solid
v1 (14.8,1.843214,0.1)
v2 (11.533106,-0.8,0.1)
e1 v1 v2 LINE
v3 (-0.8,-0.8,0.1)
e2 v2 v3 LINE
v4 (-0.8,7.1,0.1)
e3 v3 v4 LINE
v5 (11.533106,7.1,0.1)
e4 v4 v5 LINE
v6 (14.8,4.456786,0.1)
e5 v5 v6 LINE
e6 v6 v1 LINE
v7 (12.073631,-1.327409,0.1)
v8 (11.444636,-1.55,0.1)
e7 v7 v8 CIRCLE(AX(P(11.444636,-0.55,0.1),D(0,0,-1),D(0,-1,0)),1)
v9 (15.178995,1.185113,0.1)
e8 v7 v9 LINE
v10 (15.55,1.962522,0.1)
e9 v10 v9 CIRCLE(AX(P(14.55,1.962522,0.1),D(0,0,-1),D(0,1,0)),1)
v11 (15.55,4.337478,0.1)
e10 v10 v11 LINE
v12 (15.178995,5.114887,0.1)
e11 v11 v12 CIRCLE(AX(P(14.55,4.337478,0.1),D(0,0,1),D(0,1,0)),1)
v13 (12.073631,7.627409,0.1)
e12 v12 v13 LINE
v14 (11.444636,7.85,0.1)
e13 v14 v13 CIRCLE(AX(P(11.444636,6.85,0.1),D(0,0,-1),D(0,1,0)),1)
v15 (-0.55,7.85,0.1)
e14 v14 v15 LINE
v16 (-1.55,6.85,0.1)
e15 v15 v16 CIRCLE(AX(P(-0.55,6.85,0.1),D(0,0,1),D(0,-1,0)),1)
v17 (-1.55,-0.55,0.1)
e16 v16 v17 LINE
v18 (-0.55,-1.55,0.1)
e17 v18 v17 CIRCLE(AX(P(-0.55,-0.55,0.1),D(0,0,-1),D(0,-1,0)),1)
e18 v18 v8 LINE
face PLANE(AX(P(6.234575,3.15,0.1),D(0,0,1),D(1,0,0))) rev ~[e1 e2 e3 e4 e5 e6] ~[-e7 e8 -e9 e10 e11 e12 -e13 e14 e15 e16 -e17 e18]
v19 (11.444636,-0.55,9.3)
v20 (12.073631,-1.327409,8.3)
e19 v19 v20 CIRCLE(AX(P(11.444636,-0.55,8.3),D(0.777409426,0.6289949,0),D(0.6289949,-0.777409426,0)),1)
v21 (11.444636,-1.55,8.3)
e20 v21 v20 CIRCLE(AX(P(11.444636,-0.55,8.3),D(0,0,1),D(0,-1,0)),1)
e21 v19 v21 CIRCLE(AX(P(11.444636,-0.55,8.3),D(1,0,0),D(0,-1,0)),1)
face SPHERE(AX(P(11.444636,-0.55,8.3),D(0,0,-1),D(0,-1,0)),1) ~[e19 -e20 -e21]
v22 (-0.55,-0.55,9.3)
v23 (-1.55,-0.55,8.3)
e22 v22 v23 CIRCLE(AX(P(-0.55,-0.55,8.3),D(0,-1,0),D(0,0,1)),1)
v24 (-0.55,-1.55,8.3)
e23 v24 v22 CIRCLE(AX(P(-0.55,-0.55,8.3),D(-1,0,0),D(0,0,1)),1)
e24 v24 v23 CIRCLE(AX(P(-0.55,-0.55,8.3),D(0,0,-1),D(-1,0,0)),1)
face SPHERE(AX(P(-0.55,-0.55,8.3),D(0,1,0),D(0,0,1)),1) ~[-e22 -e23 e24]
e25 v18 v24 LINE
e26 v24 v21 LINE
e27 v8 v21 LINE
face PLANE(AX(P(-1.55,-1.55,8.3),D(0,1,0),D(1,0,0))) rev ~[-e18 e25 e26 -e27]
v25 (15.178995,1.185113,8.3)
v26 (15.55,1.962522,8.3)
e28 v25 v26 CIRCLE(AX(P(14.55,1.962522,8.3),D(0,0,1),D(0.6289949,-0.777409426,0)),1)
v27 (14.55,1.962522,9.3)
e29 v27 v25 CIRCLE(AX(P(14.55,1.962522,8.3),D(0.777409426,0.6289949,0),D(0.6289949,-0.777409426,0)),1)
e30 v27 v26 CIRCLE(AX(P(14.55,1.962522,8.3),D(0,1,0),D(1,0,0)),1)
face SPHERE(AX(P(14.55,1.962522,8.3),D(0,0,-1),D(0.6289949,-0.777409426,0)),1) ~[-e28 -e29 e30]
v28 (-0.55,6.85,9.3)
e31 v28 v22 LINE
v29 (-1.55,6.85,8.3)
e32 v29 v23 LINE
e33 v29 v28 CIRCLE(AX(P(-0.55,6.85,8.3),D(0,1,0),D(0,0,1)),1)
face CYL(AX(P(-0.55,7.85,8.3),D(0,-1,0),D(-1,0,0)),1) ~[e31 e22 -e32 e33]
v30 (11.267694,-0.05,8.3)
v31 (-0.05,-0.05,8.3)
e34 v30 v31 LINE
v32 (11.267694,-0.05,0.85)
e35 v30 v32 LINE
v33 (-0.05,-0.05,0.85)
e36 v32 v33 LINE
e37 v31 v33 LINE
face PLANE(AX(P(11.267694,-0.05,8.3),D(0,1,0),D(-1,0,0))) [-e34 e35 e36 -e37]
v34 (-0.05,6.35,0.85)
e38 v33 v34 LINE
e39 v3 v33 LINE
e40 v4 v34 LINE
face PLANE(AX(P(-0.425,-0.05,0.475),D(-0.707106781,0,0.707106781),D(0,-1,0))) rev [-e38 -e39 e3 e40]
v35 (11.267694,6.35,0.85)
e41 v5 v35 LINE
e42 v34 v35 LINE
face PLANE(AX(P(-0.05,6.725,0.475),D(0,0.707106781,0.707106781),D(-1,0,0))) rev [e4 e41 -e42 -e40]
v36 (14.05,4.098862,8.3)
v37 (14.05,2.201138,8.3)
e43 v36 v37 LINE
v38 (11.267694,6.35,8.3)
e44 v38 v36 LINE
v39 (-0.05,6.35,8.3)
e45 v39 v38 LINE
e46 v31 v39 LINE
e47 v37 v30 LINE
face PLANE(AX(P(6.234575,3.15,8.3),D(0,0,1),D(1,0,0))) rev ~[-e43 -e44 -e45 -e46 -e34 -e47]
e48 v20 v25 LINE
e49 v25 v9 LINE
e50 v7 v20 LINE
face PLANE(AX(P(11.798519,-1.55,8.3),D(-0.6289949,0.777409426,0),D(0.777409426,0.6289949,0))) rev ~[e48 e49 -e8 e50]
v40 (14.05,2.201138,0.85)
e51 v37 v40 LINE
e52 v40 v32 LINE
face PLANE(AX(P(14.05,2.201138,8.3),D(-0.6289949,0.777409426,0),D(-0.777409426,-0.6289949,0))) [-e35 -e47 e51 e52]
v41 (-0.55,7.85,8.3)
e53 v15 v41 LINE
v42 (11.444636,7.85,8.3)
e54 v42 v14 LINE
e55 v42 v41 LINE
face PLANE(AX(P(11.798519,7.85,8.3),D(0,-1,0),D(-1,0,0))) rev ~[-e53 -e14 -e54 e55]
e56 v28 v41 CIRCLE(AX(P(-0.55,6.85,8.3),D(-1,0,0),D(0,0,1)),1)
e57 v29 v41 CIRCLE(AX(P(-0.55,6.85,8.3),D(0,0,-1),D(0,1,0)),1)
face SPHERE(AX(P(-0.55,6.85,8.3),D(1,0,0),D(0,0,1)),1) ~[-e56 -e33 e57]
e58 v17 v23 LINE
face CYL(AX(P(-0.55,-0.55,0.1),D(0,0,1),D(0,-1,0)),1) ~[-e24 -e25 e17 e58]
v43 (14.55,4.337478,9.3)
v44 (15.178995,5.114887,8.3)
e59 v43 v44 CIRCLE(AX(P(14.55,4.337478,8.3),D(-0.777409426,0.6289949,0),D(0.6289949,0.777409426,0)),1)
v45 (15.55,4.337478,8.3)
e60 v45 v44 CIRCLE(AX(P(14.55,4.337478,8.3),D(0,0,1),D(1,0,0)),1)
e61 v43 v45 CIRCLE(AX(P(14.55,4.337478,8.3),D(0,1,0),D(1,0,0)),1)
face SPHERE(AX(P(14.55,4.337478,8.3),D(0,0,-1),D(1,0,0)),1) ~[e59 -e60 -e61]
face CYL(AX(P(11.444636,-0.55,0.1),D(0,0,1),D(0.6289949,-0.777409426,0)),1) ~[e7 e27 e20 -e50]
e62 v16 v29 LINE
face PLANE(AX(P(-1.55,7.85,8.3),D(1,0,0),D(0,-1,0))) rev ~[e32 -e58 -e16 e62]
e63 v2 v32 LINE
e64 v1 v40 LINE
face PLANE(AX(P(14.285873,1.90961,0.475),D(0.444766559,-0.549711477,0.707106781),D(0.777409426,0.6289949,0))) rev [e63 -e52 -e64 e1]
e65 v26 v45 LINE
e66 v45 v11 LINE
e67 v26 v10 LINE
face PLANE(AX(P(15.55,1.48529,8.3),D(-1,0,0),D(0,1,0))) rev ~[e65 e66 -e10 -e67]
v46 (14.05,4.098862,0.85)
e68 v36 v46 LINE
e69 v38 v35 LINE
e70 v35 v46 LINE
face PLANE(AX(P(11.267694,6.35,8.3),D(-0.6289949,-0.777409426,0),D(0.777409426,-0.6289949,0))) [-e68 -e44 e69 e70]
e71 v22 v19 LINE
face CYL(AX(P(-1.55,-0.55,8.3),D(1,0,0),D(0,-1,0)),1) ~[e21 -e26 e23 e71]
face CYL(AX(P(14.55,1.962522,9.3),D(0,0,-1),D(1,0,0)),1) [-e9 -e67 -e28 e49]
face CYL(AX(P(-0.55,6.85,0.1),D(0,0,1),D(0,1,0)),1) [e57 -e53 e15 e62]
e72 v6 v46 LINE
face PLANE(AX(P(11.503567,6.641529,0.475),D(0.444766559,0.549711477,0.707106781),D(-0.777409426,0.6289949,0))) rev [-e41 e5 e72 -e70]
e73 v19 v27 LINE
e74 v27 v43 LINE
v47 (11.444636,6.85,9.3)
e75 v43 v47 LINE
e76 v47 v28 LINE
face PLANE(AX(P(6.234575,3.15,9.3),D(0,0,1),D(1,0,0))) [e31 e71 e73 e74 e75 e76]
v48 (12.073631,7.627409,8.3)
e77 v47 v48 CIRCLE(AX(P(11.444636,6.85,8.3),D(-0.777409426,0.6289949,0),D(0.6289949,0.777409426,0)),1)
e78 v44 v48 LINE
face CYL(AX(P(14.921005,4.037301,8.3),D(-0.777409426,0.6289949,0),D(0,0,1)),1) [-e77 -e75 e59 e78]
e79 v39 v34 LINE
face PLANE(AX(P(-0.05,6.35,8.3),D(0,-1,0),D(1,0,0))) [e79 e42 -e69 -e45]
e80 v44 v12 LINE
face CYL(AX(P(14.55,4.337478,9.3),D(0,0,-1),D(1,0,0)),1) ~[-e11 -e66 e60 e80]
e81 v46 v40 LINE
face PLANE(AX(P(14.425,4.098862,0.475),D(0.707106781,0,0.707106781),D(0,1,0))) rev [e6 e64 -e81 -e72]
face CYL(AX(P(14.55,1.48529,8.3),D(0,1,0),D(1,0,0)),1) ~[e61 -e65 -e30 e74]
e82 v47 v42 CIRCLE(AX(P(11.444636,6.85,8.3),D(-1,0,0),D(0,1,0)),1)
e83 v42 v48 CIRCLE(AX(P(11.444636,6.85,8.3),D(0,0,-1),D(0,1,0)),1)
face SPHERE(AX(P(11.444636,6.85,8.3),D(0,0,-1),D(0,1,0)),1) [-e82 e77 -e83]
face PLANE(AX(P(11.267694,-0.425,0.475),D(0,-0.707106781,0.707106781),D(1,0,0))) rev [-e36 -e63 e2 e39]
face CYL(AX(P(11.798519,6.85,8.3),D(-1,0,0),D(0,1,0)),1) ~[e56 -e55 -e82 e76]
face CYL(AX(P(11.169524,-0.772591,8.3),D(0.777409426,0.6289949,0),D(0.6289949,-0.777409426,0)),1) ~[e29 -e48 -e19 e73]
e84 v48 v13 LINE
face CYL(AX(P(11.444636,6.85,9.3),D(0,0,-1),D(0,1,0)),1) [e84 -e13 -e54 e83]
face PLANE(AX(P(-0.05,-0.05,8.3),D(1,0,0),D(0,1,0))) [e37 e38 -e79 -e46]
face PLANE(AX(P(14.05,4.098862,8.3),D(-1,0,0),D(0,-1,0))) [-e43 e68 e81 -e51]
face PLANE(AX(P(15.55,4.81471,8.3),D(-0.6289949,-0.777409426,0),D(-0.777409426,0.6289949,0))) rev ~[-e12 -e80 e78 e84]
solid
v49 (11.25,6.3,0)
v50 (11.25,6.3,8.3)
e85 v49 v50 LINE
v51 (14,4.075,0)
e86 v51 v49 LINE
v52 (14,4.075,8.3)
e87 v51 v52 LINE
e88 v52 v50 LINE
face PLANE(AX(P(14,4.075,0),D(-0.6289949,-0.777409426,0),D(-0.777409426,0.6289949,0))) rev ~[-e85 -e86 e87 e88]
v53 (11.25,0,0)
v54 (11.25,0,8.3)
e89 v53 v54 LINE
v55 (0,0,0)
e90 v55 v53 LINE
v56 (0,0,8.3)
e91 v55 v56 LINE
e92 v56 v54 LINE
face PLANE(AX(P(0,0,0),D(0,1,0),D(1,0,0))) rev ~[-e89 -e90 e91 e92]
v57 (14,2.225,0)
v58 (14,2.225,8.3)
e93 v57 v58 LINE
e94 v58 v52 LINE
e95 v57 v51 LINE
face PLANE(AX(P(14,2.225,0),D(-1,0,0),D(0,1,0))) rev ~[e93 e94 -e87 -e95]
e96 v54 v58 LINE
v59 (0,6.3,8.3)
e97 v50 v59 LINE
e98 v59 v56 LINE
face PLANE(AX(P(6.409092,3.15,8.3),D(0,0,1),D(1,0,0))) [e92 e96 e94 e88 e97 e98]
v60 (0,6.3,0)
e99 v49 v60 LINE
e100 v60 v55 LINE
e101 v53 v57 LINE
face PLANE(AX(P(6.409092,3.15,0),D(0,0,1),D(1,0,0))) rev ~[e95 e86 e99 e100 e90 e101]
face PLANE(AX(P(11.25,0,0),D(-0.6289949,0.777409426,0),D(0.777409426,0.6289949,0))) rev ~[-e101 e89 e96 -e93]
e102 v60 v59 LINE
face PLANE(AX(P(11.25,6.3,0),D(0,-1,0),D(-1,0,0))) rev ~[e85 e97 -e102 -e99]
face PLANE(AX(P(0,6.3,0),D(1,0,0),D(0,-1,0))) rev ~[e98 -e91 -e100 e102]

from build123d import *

# Parameters (mm, degrees)
F1_DEPTH = 8.3
F3_DEPTH = 8.2
F5_DEPTH = 1
F6_R     = 1
F7_SIZE  = 0.75


with BuildPart() as f1:
    # F0 (on Top) → F1 (new body)
    with BuildSketch(Plane.XY):
        Polygon((0, 6.3), (0, 0), (11.25, 0), (14, 2.225), (14, 4.075), (11.25, 6.3), align=None)
    extrude(amount=F1_DEPTH)


with BuildPart() as f3:
    # F2 (on face) → F3 (new body)
    with BuildSketch(Plane.XY.offset(8.3)):
        Polygon((-1.55, 7.85), (-1.55, -1.55), (11.7985185798, -1.55), (15.55, 1.4852895127), (15.55, 4.8147104873), (11.7985185798, 7.85), align=None)
        Polygon((11.2676941477, -0.05), (-0.05, -0.05), (-0.05, 6.35), (11.2676941477, 6.35), (14.05, 4.0988616286), (14.05, 2.2011383714), align=None, mode=Mode.SUBTRACT)
    extrude(amount=-F3_DEPTH)

    # F4 (on face) → F5 (join)
    with BuildSketch(Plane.XY.offset(8.3)):
        Polygon((11.7985185798, 7.85), (-1.55, 7.85), (-1.55, -1.55), (11.7985185798, -1.55), (15.55, 1.4852895127), (15.55, 4.8147104873), align=None)
    extrude(amount=F5_DEPTH)

    # F6
    f6_edges = [f3.edges().sort_by_distance(p)[0] for p in [
        (5.124259, 7.85, 9.3),
        (-1.55, 3.15, 9.3),
        (5.124259, -1.55, 9.3),
        (13.674259, -0.032355, 9.3),
        (15.55, 3.15, 9.3),
        (13.674259, 6.332355, 9.3),
        (-1.55, -1.55, 4.7),
        (-1.55, 7.85, 4.7),
        (11.798519, 7.85, 4.7),
        (15.55, 4.81471, 4.7),
        (15.55, 1.48529, 4.7),
        (11.798519, -1.55, 4.7),
    ]]
    fillet(f6_edges, radius=F6_R)

    # F7
    f7_edges = [f3.edges().sort_by_distance(p)[0] for p in [
        (12.658847, 1.075569, 0.1),
        (14.05, 3.15, 0.1),
        (12.658847, 5.224431, 0.1),
        (5.608847, 6.35, 0.1),
        (-0.05, 3.15, 0.1),
        (5.608847, -0.05, 0.1),
    ]]
    chamfer(f7_edges, length=F7_SIZE)


solid = Compound([f1.part, f3.part])
